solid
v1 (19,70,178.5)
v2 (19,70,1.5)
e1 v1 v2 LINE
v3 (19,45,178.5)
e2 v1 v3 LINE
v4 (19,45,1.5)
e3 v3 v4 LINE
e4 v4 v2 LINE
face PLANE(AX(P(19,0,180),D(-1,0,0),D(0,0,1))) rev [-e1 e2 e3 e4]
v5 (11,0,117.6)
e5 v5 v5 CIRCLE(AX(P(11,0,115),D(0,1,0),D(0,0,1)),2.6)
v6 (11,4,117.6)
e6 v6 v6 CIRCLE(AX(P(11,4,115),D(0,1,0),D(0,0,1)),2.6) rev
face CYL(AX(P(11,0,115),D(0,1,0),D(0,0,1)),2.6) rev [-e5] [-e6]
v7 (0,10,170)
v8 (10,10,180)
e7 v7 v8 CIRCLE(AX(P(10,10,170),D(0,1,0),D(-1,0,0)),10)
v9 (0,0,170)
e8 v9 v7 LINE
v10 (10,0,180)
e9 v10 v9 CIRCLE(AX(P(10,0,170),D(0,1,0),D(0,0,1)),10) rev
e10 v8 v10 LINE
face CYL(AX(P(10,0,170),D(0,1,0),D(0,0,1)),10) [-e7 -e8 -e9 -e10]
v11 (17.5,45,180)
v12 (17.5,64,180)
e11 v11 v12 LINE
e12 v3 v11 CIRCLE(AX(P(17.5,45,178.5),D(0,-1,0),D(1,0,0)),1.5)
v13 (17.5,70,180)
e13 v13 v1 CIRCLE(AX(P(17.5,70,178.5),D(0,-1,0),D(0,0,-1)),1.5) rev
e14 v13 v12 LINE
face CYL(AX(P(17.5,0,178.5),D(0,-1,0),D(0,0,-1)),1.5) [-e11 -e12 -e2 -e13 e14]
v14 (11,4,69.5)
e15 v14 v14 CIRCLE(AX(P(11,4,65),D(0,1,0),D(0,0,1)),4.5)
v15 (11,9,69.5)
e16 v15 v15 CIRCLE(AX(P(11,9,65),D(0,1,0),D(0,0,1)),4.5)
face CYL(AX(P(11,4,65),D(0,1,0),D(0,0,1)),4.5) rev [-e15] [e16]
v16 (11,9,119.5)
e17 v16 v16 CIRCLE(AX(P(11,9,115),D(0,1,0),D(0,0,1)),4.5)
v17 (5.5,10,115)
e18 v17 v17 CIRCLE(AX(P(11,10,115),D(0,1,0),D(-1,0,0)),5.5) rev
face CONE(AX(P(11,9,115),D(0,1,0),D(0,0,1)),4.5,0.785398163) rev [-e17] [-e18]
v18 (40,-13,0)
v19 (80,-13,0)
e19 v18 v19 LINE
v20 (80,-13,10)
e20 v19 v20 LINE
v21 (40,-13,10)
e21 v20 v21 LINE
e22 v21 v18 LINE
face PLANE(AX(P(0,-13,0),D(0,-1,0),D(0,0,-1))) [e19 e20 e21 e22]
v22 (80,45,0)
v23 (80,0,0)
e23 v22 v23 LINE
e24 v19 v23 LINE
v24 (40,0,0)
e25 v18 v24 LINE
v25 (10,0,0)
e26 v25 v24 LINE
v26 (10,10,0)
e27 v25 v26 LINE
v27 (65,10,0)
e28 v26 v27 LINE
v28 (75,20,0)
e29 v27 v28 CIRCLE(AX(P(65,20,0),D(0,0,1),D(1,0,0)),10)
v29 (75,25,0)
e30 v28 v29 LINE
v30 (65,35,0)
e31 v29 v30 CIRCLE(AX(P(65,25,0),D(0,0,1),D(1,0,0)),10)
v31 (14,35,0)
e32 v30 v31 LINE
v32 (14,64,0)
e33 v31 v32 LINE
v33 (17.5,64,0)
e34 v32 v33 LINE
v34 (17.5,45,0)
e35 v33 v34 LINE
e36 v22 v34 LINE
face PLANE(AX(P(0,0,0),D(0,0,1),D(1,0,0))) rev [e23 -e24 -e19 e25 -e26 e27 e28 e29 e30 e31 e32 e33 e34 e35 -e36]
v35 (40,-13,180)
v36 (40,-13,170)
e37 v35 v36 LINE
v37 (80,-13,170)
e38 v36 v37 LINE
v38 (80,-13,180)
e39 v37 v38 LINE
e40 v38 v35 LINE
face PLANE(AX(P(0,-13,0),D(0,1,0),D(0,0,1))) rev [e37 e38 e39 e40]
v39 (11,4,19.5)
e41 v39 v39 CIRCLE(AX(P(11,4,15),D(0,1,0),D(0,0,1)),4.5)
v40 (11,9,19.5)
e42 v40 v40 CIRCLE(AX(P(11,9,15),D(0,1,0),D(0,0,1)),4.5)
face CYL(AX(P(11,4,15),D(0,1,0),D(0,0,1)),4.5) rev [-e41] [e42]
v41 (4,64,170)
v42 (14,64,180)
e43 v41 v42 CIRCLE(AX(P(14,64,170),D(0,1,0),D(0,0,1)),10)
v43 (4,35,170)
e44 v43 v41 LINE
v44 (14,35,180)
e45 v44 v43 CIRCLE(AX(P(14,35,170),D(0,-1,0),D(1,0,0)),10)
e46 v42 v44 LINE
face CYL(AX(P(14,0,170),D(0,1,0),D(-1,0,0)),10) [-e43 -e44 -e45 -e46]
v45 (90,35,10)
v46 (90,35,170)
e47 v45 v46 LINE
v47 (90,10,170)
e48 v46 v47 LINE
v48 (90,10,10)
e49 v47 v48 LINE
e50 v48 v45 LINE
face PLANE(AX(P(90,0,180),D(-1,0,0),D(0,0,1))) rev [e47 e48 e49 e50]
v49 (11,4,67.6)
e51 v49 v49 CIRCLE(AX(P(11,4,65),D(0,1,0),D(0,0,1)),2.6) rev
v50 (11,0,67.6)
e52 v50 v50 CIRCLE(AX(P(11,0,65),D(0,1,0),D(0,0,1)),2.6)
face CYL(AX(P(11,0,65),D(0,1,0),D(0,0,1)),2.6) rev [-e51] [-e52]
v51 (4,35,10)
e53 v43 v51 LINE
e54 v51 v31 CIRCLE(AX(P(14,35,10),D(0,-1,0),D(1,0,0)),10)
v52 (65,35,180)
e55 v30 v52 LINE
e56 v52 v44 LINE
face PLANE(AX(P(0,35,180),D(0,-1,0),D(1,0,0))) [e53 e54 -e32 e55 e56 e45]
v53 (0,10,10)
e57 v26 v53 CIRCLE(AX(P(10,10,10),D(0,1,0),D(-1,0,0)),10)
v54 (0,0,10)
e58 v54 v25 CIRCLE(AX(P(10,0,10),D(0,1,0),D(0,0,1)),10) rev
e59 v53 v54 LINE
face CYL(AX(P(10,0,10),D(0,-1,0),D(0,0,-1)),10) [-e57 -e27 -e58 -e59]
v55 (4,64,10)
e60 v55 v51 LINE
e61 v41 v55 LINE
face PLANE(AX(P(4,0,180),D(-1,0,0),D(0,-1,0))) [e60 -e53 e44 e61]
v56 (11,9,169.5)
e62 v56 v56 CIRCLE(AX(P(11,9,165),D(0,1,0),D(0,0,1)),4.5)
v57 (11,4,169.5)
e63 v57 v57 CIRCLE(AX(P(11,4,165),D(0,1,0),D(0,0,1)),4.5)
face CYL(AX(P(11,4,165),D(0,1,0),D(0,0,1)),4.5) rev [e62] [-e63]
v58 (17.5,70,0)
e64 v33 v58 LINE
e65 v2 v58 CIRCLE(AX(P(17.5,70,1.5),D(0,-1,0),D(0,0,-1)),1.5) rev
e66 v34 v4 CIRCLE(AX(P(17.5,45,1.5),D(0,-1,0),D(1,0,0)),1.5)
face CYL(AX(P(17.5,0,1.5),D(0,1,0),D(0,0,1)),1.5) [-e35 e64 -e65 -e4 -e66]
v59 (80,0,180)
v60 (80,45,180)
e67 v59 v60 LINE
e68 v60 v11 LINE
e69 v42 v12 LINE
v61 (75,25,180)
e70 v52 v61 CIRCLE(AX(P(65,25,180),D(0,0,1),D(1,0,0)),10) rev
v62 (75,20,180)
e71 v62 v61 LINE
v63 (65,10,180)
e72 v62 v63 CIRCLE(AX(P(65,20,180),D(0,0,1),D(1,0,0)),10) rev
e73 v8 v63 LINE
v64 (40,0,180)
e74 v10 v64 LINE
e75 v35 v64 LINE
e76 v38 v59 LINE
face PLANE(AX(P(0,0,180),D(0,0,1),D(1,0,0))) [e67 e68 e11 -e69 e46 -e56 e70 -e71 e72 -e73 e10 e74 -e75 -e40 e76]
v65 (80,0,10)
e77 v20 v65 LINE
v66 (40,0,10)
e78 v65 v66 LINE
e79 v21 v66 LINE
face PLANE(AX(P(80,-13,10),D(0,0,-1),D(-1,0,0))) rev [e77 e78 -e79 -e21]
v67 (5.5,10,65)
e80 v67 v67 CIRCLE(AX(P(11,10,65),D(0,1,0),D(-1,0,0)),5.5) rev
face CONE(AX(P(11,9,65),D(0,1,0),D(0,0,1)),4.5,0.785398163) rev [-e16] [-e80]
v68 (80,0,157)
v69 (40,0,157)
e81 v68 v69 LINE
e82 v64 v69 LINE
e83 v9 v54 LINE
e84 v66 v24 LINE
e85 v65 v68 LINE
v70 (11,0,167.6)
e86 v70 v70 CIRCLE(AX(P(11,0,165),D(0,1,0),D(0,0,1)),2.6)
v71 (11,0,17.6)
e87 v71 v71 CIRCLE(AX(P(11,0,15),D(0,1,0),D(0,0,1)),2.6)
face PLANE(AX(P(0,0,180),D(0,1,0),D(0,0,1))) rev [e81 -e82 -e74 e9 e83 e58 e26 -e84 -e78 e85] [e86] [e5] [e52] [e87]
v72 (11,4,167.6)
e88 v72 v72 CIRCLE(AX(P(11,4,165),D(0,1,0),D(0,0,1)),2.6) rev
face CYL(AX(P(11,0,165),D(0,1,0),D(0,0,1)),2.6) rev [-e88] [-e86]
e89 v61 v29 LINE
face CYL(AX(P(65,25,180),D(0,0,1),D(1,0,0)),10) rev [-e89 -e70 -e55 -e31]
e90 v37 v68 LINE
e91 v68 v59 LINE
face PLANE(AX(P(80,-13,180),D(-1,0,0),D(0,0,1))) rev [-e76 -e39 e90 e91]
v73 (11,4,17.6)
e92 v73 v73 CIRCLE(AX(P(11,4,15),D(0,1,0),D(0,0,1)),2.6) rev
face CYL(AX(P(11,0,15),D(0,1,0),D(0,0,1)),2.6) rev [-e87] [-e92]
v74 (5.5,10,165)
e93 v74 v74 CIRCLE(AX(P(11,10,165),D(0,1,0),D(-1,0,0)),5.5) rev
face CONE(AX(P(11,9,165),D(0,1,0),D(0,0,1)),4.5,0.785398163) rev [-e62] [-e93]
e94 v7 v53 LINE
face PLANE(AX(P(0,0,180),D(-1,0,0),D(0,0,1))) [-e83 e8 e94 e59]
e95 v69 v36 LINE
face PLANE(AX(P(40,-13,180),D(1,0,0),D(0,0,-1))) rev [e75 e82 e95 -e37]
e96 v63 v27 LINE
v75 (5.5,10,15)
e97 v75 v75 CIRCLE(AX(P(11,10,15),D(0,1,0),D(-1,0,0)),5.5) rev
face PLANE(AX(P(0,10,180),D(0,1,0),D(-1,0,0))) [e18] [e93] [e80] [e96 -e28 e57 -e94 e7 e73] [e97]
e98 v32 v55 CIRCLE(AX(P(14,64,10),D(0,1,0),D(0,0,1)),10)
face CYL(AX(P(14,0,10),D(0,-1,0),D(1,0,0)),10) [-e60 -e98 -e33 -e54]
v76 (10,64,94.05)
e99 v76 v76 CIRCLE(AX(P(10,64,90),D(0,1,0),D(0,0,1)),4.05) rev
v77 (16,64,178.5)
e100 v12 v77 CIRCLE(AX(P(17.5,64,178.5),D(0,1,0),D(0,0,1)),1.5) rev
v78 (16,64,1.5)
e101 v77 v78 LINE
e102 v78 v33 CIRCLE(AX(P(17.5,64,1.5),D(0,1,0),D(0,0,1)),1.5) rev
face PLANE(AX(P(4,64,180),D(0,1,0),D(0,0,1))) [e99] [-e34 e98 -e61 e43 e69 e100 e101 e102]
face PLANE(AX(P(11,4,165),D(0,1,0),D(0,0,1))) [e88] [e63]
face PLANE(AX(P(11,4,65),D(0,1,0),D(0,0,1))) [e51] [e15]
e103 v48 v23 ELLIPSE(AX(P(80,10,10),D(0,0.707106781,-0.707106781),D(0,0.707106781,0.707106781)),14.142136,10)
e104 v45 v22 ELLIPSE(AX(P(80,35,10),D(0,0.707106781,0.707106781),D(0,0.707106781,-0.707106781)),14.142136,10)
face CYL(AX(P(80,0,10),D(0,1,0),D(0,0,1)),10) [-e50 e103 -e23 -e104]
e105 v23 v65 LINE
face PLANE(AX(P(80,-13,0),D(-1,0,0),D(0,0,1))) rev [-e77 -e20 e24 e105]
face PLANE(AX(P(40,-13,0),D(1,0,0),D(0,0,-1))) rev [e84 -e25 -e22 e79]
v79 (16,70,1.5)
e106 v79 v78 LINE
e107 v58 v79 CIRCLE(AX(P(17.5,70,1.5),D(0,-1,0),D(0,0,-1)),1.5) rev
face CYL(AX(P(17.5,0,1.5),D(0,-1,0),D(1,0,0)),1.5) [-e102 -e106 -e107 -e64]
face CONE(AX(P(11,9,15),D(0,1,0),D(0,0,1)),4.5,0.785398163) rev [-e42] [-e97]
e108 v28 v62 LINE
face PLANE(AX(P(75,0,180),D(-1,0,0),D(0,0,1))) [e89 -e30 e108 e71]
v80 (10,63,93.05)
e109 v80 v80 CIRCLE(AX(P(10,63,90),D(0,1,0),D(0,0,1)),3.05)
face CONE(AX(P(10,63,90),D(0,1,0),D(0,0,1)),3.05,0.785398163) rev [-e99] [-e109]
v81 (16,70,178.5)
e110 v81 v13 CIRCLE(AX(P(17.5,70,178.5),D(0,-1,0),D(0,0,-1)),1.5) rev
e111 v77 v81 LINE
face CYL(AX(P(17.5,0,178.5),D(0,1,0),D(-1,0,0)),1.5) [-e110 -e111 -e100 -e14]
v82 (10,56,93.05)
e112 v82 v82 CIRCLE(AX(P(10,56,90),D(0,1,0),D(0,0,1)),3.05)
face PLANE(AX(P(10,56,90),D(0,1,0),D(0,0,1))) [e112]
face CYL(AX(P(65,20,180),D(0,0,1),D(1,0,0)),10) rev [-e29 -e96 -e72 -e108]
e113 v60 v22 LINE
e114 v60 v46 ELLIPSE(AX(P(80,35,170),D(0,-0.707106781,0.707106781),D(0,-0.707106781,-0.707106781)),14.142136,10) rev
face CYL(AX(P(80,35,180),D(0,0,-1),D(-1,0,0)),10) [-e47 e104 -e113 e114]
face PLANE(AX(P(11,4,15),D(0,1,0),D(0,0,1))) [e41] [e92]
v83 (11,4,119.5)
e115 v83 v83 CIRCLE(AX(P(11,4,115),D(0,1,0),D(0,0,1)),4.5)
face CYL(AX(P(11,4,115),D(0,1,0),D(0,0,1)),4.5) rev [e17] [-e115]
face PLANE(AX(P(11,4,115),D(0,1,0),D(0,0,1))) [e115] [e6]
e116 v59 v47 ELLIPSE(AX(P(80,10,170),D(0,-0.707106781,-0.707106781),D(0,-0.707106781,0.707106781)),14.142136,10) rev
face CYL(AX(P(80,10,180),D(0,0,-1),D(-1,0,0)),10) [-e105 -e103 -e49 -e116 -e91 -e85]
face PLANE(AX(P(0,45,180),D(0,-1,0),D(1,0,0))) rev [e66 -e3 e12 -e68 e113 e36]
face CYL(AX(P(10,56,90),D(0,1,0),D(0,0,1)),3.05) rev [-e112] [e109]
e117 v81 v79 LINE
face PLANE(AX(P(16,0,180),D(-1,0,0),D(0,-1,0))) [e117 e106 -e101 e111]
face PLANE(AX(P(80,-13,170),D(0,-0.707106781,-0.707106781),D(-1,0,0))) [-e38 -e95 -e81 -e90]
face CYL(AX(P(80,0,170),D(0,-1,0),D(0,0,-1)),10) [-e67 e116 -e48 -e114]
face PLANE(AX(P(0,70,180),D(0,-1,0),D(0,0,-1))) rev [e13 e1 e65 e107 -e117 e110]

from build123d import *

# Parameters (mm, degrees)
BOSS_EXTRUDE1_DEPTH = 180
SKETCH2_R           = 2.6
CUT_EXTRUDE1_DEPTH  = 211
SKETCH2_3_R         = 4.5
CUT_EXTRUDE2_DEPTH  = 6
SKETCH3_R           = 3.05
CUT_EXTRUDE3_DEPTH  = 8
FILLET4_R           = 10
CHAMFER1_SIZE       = 1
FILLET5_R           = 1.5
SKETCH4_W           = 40
SKETCH4_H           = 10
BOSS_EXTRUDE2_DEPTH = 13
CHAMFER2_SIZE       = 13


# Some blends are built 0.0001 mm under size
with BuildPart() as part:
    # Sketch1 → Boss-Extrude1 (new body)
    with BuildSketch(Plane.XY):
        Polygon((0, 10), (0, 0), (90, 0), (90, 45), (19, 45), (19, 70), (16, 70), (16, 64), (4, 64), (4, 35), (75, 35), (75, 10), align=None)
    extrude(amount=BOSS_EXTRUDE1_DEPTH)

    # Sketch2 → Cut-Extrude1 (cut, through all)
    with BuildSketch(Plane(origin=(0, 10, 0), x_dir=(1, 0, 0), z_dir=(0, 1, 0))):
        with Locations(Location((11, -65, 0), (0, 0, 270))):
            Circle(SKETCH2_R)
        with Locations(Location((11, -15, 0), (0, 0, 270))):
            Circle(SKETCH2_R)
        with Locations(Location((11, -115, 0), (0, 0, 270))):
            Circle(SKETCH2_R)
        with Locations(Location((11, -165, 0), (0, 0, 270))):
            Circle(SKETCH2_R)
    extrude(amount=-CUT_EXTRUDE1_DEPTH, mode=Mode.SUBTRACT)

    # Sketch2<3> → Cut-Extrude2 (cut)
    with BuildSketch(Plane(origin=(0, 10, 0), x_dir=(1, 0, 0), z_dir=(0, 1, 0))):
        with Locations(Location((11, -65, 0), (0, 0, 270))):
            Circle(SKETCH2_3_R)
        with Locations(Location((11, -15, 0), (0, 0, 270))):
            Circle(SKETCH2_3_R)
        with Locations(Location((11, -115, 0), (0, 0, 270))):
            Circle(SKETCH2_3_R)
        with Locations(Location((11, -165, 0), (0, 0, 270))):
            Circle(SKETCH2_3_R)
    extrude(amount=-CUT_EXTRUDE2_DEPTH, mode=Mode.SUBTRACT)

    # Sketch3 → Cut-Extrude3 (cut)
    with BuildSketch(Plane(origin=(0, 64, 0), x_dir=(1, 0, 0), z_dir=(0, 1, 0))):
        with Locations(Location((10, -90, 0), (0, 0, 270))):
            Circle(SKETCH3_R)
    extrude(amount=-CUT_EXTRUDE3_DEPTH, mode=Mode.SUBTRACT)

    # Fillet4
    fillet4_edges = [part.edges().sort_by_distance(p)[0] for p in [
        (90, 22.5, 180),
        (0, 5, 0),
        (4, 49.5, 0),
        (90, 22.5, 0),
        (75, 10, 90),
        (75, 35, 90),
        (90, 45, 90),
        (90, 0, 90),
        (4, 49.5, 180),
        (0, 5, 180),
    ]]
    fillet(fillet4_edges, radius=FILLET4_R)

    # Chamfer1
    chamfer1_edges = [part.edges().sort_by_distance(p)[0] for p in [
        (10, 64, 86.95),
        (11, 10, 10.5),
        (11, 10, 60.5),
        (11, 10, 110.5),
        (11, 10, 160.5),
    ]]
    chamfer(chamfer1_edges, length=CHAMFER1_SIZE)

    # Fillet5
    fillet5_edges = [part.edges().sort_by_distance(p)[0] for p in [
        (19, 57.5, 0),
        (16, 67, 0),
        (19, 57.5, 180),
        (16, 67, 180),
    ]]
    fillet(fillet5_edges, radius=FILLET5_R - 0.0001)  # a hair under: the kernel refuses the full size

    # Sketch4 → Boss-Extrude2 (add)
    with BuildSketch(Plane.XZ):
        with Locations((60, 5)):
            Rectangle(SKETCH4_W, SKETCH4_H)
        with Locations((60, 175)):
            Rectangle(SKETCH4_W, SKETCH4_H)
    extrude(amount=BOSS_EXTRUDE2_DEPTH)

    # Chamfer2
    # the kernel refuses this chamfer: 13 mm, written as the material it adds along each edge
    with BuildSketch(Plane(origin=(40, 0, 170), x_dir=(0, 0.027495876610586372, -0.9996219169112968), z_dir=(1, 0, 0))) as chamfer2_piece_1_section:
        Polygon((CHAMFER2_SIZE * 0.999621916911, -CHAMFER2_SIZE * 0.0274958766106), (-CHAMFER2_SIZE * 0.0274958766106, -CHAMFER2_SIZE * 0.999621916911), (0, 0), align=None)
    chamfer2_piece_1 = extrude(amount=40, mode=Mode.PRIVATE)
    chamfer2_piece_1 = split(chamfer2_piece_1, bisect_by=Plane(origin=(60, -13, 165.704745994), z_dir=(0, 1, 0)), keep=Keep.TOP, mode=Mode.PRIVATE)
    add(chamfer2_piece_1)


solid = part.part
